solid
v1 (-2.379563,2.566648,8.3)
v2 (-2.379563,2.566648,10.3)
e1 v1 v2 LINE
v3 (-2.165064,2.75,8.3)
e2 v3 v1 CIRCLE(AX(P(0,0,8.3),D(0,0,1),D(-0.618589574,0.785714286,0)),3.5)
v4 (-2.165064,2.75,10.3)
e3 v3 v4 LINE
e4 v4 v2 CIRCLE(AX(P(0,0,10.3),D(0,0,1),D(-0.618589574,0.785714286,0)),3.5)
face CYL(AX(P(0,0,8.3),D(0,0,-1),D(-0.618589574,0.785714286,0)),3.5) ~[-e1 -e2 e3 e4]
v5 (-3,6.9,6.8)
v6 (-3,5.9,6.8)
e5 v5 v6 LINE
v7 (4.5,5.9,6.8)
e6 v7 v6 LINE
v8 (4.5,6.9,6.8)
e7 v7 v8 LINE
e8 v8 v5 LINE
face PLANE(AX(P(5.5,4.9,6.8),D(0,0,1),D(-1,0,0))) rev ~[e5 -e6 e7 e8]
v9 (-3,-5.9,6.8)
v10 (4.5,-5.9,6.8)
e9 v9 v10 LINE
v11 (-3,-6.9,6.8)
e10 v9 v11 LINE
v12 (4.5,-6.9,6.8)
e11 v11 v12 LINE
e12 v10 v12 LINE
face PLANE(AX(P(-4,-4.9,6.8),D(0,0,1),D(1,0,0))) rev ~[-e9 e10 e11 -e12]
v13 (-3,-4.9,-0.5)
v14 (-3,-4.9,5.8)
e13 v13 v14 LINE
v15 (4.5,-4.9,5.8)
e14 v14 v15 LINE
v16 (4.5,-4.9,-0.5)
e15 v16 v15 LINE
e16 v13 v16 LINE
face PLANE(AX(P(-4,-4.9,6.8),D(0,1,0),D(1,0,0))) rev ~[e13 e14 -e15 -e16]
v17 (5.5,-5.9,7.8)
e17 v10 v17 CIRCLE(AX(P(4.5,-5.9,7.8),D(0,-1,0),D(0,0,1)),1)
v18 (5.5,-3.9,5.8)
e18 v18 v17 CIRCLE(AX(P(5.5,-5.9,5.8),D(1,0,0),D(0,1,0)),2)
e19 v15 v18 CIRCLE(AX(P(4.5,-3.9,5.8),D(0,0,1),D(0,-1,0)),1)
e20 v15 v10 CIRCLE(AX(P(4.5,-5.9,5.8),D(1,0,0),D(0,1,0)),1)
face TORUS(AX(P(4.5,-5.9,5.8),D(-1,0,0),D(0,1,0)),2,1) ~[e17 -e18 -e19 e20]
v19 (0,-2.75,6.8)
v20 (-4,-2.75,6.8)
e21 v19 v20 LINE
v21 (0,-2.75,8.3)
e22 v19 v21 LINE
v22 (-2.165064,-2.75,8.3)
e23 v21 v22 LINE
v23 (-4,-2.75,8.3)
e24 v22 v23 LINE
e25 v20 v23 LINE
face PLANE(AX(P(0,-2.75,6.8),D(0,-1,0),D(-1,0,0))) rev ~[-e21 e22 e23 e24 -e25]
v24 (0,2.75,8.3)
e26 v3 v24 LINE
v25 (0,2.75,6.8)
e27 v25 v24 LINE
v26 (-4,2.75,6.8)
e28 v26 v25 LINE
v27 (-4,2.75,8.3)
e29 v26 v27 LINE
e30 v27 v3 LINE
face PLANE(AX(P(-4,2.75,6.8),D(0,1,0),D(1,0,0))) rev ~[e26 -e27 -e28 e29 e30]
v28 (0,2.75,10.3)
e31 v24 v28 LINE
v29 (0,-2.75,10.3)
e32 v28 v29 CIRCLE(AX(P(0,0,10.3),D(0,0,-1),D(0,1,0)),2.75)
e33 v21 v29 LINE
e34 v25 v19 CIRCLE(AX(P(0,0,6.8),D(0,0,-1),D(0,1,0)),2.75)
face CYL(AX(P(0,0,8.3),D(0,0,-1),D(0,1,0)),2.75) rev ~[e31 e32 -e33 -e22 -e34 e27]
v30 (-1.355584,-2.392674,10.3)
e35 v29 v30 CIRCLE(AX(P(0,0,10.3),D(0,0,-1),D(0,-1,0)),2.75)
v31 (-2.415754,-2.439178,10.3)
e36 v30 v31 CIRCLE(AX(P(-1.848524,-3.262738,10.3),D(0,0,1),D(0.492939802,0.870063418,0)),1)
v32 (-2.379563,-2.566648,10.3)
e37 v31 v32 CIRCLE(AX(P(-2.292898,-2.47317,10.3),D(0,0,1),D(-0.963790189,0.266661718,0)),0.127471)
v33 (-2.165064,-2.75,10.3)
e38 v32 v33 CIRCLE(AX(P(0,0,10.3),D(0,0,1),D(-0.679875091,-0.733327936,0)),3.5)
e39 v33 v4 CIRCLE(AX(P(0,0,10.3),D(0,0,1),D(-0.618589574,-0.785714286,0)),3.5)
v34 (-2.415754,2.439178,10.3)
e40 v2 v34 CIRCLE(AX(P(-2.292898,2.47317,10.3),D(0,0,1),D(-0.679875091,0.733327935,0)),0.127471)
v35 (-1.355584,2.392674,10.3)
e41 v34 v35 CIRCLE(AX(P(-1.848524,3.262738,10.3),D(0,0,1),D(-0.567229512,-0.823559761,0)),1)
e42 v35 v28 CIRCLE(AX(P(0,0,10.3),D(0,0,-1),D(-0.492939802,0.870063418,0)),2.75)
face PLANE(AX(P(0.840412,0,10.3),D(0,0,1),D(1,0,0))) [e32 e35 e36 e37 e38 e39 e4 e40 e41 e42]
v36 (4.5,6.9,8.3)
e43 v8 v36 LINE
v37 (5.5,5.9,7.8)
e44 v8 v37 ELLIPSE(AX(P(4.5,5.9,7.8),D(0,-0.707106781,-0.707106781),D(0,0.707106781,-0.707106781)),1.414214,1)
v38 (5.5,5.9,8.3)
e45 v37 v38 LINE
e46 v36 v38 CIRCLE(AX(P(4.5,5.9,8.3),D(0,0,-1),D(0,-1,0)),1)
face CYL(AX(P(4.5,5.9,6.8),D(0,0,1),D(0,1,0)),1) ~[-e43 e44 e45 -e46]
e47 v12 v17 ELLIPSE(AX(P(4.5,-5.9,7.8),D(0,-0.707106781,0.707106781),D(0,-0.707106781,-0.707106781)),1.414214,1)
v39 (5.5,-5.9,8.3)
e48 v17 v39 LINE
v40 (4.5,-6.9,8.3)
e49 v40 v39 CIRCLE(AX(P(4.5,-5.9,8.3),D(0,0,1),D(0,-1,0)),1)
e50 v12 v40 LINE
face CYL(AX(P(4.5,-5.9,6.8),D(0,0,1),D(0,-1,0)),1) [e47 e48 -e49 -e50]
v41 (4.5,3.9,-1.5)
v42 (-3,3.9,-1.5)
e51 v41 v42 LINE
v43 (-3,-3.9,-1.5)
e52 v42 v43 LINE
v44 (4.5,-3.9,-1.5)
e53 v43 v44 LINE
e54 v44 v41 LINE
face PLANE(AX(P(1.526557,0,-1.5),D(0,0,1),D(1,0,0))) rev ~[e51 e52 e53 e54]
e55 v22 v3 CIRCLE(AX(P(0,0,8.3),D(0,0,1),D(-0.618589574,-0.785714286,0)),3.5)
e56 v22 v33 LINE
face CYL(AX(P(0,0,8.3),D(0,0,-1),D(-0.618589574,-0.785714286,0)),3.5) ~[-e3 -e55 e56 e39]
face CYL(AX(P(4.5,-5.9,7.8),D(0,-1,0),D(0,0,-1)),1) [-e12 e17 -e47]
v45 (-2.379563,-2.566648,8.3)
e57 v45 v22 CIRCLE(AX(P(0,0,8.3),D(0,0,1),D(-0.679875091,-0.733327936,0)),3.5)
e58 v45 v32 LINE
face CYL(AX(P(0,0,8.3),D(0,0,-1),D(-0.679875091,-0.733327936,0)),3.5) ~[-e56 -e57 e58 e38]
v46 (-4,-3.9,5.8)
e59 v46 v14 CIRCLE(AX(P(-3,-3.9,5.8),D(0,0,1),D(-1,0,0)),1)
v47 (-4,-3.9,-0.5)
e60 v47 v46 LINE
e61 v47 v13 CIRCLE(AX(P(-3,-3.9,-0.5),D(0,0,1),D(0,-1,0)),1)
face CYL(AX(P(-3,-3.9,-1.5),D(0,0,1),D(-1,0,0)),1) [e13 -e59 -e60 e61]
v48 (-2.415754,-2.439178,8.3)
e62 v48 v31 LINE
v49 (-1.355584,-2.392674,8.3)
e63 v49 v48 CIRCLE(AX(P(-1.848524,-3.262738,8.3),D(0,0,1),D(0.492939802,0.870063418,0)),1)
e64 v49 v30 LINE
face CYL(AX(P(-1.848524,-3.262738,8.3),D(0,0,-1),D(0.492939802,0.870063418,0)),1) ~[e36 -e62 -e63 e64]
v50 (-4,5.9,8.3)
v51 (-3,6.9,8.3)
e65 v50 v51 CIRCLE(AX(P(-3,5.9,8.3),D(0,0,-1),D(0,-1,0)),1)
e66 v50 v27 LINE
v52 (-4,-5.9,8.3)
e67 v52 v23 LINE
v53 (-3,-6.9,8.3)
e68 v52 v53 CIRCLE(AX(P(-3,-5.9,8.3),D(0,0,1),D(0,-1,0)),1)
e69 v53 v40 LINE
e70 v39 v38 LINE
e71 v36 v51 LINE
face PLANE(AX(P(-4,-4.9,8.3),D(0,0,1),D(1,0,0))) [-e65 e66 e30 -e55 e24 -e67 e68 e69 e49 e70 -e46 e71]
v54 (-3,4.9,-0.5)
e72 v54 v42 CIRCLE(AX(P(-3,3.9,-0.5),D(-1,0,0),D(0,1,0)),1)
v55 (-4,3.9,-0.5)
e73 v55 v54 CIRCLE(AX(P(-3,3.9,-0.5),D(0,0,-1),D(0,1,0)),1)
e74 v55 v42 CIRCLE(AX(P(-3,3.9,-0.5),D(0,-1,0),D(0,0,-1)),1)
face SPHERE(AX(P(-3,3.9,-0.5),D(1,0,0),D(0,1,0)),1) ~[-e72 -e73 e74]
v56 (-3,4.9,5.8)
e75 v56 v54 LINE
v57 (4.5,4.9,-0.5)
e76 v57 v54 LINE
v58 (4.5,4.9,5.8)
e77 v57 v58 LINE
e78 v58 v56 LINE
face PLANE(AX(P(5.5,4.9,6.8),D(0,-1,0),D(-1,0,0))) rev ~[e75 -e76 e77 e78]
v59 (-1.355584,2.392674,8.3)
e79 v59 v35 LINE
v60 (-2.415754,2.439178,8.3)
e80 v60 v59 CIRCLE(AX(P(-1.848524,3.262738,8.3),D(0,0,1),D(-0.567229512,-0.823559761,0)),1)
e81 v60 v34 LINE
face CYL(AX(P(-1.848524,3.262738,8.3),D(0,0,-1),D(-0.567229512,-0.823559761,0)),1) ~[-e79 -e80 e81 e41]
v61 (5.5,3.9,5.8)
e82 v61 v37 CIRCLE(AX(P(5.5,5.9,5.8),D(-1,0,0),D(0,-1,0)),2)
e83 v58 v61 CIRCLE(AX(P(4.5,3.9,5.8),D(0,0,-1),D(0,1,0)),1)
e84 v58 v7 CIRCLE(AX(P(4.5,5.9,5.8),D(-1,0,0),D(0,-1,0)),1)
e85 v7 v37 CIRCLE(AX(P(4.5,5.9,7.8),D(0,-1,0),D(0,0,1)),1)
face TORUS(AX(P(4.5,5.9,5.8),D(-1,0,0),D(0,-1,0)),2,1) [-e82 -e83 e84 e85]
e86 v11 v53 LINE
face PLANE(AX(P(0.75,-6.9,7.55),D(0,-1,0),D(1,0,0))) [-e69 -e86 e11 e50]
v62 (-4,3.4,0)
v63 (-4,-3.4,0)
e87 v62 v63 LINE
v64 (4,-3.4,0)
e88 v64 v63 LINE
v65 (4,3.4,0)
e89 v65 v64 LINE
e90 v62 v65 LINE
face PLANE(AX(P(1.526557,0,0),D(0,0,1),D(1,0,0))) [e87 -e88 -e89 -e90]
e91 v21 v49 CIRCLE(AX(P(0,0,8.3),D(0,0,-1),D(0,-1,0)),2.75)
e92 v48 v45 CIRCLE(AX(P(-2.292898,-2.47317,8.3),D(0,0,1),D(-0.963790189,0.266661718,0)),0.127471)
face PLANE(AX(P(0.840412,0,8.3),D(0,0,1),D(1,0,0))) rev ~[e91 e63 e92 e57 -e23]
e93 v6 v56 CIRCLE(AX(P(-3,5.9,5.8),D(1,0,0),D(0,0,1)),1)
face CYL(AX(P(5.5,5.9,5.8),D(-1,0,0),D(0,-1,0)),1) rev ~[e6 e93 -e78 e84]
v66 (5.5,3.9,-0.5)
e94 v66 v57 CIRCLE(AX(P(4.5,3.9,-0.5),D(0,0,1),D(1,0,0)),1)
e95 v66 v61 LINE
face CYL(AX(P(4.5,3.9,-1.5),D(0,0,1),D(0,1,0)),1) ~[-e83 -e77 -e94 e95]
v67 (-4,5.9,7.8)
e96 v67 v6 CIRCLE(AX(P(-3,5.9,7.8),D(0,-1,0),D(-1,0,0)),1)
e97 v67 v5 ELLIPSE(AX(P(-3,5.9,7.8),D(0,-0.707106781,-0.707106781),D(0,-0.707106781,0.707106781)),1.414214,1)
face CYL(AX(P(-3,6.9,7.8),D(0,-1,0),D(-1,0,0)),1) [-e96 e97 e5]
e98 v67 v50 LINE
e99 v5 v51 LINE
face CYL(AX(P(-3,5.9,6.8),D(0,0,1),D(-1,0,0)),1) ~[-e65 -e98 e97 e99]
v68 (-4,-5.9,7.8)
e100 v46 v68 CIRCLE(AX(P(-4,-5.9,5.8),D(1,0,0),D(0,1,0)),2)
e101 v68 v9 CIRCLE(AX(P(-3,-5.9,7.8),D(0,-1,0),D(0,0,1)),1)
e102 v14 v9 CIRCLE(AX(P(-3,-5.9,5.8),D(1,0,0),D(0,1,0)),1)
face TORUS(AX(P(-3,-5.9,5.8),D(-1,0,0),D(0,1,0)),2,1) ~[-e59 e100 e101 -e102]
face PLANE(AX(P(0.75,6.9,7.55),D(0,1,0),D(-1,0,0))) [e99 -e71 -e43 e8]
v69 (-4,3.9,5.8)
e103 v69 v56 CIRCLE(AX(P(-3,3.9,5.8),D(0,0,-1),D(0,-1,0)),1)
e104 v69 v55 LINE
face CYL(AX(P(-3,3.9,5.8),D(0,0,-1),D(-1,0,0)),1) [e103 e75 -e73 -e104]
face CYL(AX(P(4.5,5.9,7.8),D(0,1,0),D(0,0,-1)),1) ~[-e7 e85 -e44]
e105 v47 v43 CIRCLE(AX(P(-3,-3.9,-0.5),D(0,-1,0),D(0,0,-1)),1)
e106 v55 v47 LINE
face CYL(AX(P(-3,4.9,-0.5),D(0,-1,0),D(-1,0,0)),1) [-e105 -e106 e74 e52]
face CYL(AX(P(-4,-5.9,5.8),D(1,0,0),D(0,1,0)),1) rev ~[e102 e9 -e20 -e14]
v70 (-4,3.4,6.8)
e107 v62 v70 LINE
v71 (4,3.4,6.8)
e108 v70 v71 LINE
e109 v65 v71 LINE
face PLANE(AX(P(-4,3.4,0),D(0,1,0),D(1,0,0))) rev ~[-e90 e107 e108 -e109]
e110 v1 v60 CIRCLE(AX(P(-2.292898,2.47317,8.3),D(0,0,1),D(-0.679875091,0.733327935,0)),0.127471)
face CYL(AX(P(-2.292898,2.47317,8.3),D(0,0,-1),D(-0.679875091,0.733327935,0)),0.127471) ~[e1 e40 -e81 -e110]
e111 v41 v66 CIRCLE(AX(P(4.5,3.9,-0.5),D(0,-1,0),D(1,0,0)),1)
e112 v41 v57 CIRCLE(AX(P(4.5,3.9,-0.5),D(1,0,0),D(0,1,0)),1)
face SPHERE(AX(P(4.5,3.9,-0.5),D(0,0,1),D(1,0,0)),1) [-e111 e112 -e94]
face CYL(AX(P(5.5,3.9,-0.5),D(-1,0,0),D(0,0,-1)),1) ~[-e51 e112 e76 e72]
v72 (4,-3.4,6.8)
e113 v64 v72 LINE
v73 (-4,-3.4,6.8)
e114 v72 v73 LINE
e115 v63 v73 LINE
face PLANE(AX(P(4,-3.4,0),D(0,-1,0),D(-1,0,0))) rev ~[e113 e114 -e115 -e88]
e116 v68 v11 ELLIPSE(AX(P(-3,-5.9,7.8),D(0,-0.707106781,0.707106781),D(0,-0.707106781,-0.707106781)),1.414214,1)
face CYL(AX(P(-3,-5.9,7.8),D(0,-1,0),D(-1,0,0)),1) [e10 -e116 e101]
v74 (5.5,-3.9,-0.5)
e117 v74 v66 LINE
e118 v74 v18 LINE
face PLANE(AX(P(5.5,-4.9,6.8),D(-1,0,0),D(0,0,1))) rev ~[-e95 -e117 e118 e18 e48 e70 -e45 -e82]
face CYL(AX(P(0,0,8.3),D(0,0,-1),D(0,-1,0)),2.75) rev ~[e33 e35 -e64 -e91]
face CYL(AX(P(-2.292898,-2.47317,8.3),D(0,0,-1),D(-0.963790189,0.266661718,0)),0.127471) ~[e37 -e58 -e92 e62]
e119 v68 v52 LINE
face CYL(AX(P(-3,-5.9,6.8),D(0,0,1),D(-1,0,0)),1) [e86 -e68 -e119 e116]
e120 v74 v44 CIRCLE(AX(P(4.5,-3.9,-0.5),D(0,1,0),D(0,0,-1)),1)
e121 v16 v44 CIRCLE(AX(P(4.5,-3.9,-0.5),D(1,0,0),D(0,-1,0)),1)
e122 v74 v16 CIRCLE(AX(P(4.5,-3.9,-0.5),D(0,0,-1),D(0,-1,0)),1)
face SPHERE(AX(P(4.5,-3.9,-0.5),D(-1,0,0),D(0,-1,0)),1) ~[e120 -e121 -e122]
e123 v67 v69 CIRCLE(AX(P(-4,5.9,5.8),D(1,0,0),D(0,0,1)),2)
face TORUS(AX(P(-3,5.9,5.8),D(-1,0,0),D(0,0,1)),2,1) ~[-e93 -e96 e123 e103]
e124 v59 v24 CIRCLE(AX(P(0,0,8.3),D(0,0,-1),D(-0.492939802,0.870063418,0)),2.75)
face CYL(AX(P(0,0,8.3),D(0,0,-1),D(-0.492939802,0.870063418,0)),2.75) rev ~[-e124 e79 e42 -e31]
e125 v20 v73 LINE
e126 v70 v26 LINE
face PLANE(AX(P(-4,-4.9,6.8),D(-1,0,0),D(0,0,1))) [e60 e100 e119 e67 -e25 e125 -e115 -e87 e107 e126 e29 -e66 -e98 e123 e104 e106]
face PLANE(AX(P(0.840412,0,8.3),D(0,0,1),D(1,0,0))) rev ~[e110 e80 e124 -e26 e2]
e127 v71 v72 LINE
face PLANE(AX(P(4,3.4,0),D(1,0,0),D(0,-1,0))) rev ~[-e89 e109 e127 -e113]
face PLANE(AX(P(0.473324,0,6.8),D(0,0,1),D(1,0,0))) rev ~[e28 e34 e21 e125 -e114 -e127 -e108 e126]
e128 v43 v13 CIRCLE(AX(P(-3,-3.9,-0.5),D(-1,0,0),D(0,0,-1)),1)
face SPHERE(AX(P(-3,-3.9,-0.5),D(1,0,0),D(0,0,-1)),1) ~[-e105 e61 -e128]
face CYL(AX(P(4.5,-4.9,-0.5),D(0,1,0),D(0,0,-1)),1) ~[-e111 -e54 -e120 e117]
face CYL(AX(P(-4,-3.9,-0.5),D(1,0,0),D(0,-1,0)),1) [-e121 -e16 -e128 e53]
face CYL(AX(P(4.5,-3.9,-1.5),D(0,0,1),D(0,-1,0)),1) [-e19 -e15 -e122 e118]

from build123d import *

# Parameters (mm, degrees)
F0_W      = 8
F0_H      = 6.8
F1_DEPTH  = 1.5
F2_DEPTH  = 6.8
F4_DEPTH  = 1.5
F6_DEPTH  = 2
F7_W      = 9.5
F7_H      = 1.5
F8_DEPTH  = 2
F9_W      = 9.5
F9_H      = 1.5
F10_DEPTH = 2
F11_F1_R  = 1
F11_F2_R  = 1


with BuildPart() as f1:
    # F0 (on Top) → F1 (new body)
    with BuildSketch(Plane.XY):
        Polygon((4, 3.4), (4, -3.4), (-4, -3.4), (-4, -4.9), (5.5, -4.9), (5.5, 4.9), (-4, 4.9), (-4, 3.4), align=None)
        Rectangle(F0_W, F0_H)
    extrude(amount=-F1_DEPTH)

    # F0 (on Top) → F2 (join)
    with BuildSketch(Plane.XY):
        Polygon((4, 3.4), (4, -3.4), (-4, -3.4), (-4, -4.9), (5.5, -4.9), (5.5, 4.9), (-4, 4.9), (-4, 3.4), align=None)
    extrude(amount=F2_DEPTH)

    # F3 (on face) → F4 (join)
    with BuildSketch(Plane.XY.offset(6.8)):
        with BuildLine():
            ThreePointArc((0, 2.75), (2.75, 0), (0, -2.75))
            Line((0, -2.75), (-4, -2.75))
            Line((-4, -2.75), (-4, -3.4))
            Line((-4, -3.4), (4, -3.4))
            Line((4, -3.4), (4, 3.4))
            Line((4, 3.4), (-4, 3.4))
            Line((-4, 3.4), (-4, 2.75))
            Line((-4, 2.75), (0, 2.75))
        make_face()
        Polygon((4, -3.4), (-4, -3.4), (-4, -4.9), (5.5, -4.9), (5.5, 4.9), (-4, 4.9), (-4, 3.4), (4, 3.4), align=None)
    extrude(amount=F4_DEPTH)

    # F5 (on face) → F6 (join)
    with BuildSketch(Plane.XY.offset(8.3)):
        with BuildLine():
            ThreePointArc((0, 2.75), (2.75, 0), (0, -2.75))
            Line((0, -2.75), (-2.1650635095, -2.75))
            ThreePointArc((-2.1650635095, -2.75), (3.5, 0), (-2.1650635095, 2.75))
            Line((-2.1650635095, 2.75), (0, 2.75))
        make_face()
        with BuildLine():
            ThreePointArc((-1.3555844547, 2.3926744004), (-0.7009441486, 2.6591685356), (0, 2.75))
            Line((0, 2.75), (-2.1650635095, 2.75))
            ThreePointArc((-2.1650635095, 2.75), (-2.2741617405, 2.6604864928), (-2.3795628172, 2.5666477747))
            ThreePointArc((-2.3795628172, 2.5666477747), (-2.4155229026, 2.507985001), (-2.4157537689, 2.4391780576))
            ThreePointArc((-2.4157537689, 2.4391780576), (-1.8923464861, 2.2636984741), (-1.3555844547, 2.3926744004))
        make_face()
        with BuildLine():
            ThreePointArc((0, -2.75), (-0.7009441486, -2.6591685356), (-1.3555844547, -2.3926744004))
            ThreePointArc((-1.3555844547, -2.3926744004), (-1.8923464861, -2.2636984741), (-2.4157537689, -2.4391780576))
            ThreePointArc((-2.4157537689, -2.4391780576), (-2.4155229026, -2.507985001), (-2.3795628172, -2.5666477747))
            ThreePointArc((-2.3795628172, -2.5666477747), (-2.2741617405, -2.6604864928), (-2.1650635095, -2.75))
            Line((-2.1650635095, -2.75), (0, -2.75))
        make_face()
    extrude(amount=F6_DEPTH)

    # F7 (on face) → F8 (join)
    with BuildSketch(Plane(origin=(0, 4.9, 0), x_dir=(-1, 0, 0), z_dir=(0, 1, 0))):
        with Locations((-0.75, 7.55)):
            Rectangle(F7_W, F7_H)
    extrude(amount=F8_DEPTH)

    # F9 (on face) → F10 (join)
    with BuildSketch(Plane.XZ.offset(4.9)):
        with Locations((0.75, 7.55)):
            Rectangle(F9_W, F9_H)
    extrude(amount=F10_DEPTH)

    # F11: fillet of radius 1 on 16 edges, made by hand

    # F11_f1
    f11_f1_edges = [f1.edges().sort_by_distance(p)[0] for p in [
        (0.75, -4.9, 6.8),
        (0.75, 4.9, 6.8),
    ]]
    fillet(f11_f1_edges, radius=F11_F1_R)

    # F11_f2
    f11_f2_edges = [f1.edges().sort_by_distance(p)[0] for p in [
        (0.75, -4.9, -1.5),
        (5.5, -4.9, 2.15),
        (5.5, 4.9, 2.15),
        (5.5, 0, -1.5),
        (0.75, 4.9, -1.5),
        (-4, 4.9, 2.15),
        (-4, 0, -1.5),
        (-4, -4.9, 2.15),
        (-4, 6.9, 7.55),
        (-4, 6.4, 6.8),
        (5.5, 6.9, 7.55),
        (5.5, -6.9, 7.55),
        (-4, -6.9, 7.55),
        (-4, -6.4, 6.8),
        (-4, -5.1928932188, 6.5071067812),
        (-4, 5.1928932188, 6.5071067812),
        (5.5, 5.1928932188, 6.5071067812),
        (5.5, -5.1928932188, 6.5071067812),
    ]]
    fillet(f11_f2_edges, radius=F11_F2_R)


solid = f1.part
